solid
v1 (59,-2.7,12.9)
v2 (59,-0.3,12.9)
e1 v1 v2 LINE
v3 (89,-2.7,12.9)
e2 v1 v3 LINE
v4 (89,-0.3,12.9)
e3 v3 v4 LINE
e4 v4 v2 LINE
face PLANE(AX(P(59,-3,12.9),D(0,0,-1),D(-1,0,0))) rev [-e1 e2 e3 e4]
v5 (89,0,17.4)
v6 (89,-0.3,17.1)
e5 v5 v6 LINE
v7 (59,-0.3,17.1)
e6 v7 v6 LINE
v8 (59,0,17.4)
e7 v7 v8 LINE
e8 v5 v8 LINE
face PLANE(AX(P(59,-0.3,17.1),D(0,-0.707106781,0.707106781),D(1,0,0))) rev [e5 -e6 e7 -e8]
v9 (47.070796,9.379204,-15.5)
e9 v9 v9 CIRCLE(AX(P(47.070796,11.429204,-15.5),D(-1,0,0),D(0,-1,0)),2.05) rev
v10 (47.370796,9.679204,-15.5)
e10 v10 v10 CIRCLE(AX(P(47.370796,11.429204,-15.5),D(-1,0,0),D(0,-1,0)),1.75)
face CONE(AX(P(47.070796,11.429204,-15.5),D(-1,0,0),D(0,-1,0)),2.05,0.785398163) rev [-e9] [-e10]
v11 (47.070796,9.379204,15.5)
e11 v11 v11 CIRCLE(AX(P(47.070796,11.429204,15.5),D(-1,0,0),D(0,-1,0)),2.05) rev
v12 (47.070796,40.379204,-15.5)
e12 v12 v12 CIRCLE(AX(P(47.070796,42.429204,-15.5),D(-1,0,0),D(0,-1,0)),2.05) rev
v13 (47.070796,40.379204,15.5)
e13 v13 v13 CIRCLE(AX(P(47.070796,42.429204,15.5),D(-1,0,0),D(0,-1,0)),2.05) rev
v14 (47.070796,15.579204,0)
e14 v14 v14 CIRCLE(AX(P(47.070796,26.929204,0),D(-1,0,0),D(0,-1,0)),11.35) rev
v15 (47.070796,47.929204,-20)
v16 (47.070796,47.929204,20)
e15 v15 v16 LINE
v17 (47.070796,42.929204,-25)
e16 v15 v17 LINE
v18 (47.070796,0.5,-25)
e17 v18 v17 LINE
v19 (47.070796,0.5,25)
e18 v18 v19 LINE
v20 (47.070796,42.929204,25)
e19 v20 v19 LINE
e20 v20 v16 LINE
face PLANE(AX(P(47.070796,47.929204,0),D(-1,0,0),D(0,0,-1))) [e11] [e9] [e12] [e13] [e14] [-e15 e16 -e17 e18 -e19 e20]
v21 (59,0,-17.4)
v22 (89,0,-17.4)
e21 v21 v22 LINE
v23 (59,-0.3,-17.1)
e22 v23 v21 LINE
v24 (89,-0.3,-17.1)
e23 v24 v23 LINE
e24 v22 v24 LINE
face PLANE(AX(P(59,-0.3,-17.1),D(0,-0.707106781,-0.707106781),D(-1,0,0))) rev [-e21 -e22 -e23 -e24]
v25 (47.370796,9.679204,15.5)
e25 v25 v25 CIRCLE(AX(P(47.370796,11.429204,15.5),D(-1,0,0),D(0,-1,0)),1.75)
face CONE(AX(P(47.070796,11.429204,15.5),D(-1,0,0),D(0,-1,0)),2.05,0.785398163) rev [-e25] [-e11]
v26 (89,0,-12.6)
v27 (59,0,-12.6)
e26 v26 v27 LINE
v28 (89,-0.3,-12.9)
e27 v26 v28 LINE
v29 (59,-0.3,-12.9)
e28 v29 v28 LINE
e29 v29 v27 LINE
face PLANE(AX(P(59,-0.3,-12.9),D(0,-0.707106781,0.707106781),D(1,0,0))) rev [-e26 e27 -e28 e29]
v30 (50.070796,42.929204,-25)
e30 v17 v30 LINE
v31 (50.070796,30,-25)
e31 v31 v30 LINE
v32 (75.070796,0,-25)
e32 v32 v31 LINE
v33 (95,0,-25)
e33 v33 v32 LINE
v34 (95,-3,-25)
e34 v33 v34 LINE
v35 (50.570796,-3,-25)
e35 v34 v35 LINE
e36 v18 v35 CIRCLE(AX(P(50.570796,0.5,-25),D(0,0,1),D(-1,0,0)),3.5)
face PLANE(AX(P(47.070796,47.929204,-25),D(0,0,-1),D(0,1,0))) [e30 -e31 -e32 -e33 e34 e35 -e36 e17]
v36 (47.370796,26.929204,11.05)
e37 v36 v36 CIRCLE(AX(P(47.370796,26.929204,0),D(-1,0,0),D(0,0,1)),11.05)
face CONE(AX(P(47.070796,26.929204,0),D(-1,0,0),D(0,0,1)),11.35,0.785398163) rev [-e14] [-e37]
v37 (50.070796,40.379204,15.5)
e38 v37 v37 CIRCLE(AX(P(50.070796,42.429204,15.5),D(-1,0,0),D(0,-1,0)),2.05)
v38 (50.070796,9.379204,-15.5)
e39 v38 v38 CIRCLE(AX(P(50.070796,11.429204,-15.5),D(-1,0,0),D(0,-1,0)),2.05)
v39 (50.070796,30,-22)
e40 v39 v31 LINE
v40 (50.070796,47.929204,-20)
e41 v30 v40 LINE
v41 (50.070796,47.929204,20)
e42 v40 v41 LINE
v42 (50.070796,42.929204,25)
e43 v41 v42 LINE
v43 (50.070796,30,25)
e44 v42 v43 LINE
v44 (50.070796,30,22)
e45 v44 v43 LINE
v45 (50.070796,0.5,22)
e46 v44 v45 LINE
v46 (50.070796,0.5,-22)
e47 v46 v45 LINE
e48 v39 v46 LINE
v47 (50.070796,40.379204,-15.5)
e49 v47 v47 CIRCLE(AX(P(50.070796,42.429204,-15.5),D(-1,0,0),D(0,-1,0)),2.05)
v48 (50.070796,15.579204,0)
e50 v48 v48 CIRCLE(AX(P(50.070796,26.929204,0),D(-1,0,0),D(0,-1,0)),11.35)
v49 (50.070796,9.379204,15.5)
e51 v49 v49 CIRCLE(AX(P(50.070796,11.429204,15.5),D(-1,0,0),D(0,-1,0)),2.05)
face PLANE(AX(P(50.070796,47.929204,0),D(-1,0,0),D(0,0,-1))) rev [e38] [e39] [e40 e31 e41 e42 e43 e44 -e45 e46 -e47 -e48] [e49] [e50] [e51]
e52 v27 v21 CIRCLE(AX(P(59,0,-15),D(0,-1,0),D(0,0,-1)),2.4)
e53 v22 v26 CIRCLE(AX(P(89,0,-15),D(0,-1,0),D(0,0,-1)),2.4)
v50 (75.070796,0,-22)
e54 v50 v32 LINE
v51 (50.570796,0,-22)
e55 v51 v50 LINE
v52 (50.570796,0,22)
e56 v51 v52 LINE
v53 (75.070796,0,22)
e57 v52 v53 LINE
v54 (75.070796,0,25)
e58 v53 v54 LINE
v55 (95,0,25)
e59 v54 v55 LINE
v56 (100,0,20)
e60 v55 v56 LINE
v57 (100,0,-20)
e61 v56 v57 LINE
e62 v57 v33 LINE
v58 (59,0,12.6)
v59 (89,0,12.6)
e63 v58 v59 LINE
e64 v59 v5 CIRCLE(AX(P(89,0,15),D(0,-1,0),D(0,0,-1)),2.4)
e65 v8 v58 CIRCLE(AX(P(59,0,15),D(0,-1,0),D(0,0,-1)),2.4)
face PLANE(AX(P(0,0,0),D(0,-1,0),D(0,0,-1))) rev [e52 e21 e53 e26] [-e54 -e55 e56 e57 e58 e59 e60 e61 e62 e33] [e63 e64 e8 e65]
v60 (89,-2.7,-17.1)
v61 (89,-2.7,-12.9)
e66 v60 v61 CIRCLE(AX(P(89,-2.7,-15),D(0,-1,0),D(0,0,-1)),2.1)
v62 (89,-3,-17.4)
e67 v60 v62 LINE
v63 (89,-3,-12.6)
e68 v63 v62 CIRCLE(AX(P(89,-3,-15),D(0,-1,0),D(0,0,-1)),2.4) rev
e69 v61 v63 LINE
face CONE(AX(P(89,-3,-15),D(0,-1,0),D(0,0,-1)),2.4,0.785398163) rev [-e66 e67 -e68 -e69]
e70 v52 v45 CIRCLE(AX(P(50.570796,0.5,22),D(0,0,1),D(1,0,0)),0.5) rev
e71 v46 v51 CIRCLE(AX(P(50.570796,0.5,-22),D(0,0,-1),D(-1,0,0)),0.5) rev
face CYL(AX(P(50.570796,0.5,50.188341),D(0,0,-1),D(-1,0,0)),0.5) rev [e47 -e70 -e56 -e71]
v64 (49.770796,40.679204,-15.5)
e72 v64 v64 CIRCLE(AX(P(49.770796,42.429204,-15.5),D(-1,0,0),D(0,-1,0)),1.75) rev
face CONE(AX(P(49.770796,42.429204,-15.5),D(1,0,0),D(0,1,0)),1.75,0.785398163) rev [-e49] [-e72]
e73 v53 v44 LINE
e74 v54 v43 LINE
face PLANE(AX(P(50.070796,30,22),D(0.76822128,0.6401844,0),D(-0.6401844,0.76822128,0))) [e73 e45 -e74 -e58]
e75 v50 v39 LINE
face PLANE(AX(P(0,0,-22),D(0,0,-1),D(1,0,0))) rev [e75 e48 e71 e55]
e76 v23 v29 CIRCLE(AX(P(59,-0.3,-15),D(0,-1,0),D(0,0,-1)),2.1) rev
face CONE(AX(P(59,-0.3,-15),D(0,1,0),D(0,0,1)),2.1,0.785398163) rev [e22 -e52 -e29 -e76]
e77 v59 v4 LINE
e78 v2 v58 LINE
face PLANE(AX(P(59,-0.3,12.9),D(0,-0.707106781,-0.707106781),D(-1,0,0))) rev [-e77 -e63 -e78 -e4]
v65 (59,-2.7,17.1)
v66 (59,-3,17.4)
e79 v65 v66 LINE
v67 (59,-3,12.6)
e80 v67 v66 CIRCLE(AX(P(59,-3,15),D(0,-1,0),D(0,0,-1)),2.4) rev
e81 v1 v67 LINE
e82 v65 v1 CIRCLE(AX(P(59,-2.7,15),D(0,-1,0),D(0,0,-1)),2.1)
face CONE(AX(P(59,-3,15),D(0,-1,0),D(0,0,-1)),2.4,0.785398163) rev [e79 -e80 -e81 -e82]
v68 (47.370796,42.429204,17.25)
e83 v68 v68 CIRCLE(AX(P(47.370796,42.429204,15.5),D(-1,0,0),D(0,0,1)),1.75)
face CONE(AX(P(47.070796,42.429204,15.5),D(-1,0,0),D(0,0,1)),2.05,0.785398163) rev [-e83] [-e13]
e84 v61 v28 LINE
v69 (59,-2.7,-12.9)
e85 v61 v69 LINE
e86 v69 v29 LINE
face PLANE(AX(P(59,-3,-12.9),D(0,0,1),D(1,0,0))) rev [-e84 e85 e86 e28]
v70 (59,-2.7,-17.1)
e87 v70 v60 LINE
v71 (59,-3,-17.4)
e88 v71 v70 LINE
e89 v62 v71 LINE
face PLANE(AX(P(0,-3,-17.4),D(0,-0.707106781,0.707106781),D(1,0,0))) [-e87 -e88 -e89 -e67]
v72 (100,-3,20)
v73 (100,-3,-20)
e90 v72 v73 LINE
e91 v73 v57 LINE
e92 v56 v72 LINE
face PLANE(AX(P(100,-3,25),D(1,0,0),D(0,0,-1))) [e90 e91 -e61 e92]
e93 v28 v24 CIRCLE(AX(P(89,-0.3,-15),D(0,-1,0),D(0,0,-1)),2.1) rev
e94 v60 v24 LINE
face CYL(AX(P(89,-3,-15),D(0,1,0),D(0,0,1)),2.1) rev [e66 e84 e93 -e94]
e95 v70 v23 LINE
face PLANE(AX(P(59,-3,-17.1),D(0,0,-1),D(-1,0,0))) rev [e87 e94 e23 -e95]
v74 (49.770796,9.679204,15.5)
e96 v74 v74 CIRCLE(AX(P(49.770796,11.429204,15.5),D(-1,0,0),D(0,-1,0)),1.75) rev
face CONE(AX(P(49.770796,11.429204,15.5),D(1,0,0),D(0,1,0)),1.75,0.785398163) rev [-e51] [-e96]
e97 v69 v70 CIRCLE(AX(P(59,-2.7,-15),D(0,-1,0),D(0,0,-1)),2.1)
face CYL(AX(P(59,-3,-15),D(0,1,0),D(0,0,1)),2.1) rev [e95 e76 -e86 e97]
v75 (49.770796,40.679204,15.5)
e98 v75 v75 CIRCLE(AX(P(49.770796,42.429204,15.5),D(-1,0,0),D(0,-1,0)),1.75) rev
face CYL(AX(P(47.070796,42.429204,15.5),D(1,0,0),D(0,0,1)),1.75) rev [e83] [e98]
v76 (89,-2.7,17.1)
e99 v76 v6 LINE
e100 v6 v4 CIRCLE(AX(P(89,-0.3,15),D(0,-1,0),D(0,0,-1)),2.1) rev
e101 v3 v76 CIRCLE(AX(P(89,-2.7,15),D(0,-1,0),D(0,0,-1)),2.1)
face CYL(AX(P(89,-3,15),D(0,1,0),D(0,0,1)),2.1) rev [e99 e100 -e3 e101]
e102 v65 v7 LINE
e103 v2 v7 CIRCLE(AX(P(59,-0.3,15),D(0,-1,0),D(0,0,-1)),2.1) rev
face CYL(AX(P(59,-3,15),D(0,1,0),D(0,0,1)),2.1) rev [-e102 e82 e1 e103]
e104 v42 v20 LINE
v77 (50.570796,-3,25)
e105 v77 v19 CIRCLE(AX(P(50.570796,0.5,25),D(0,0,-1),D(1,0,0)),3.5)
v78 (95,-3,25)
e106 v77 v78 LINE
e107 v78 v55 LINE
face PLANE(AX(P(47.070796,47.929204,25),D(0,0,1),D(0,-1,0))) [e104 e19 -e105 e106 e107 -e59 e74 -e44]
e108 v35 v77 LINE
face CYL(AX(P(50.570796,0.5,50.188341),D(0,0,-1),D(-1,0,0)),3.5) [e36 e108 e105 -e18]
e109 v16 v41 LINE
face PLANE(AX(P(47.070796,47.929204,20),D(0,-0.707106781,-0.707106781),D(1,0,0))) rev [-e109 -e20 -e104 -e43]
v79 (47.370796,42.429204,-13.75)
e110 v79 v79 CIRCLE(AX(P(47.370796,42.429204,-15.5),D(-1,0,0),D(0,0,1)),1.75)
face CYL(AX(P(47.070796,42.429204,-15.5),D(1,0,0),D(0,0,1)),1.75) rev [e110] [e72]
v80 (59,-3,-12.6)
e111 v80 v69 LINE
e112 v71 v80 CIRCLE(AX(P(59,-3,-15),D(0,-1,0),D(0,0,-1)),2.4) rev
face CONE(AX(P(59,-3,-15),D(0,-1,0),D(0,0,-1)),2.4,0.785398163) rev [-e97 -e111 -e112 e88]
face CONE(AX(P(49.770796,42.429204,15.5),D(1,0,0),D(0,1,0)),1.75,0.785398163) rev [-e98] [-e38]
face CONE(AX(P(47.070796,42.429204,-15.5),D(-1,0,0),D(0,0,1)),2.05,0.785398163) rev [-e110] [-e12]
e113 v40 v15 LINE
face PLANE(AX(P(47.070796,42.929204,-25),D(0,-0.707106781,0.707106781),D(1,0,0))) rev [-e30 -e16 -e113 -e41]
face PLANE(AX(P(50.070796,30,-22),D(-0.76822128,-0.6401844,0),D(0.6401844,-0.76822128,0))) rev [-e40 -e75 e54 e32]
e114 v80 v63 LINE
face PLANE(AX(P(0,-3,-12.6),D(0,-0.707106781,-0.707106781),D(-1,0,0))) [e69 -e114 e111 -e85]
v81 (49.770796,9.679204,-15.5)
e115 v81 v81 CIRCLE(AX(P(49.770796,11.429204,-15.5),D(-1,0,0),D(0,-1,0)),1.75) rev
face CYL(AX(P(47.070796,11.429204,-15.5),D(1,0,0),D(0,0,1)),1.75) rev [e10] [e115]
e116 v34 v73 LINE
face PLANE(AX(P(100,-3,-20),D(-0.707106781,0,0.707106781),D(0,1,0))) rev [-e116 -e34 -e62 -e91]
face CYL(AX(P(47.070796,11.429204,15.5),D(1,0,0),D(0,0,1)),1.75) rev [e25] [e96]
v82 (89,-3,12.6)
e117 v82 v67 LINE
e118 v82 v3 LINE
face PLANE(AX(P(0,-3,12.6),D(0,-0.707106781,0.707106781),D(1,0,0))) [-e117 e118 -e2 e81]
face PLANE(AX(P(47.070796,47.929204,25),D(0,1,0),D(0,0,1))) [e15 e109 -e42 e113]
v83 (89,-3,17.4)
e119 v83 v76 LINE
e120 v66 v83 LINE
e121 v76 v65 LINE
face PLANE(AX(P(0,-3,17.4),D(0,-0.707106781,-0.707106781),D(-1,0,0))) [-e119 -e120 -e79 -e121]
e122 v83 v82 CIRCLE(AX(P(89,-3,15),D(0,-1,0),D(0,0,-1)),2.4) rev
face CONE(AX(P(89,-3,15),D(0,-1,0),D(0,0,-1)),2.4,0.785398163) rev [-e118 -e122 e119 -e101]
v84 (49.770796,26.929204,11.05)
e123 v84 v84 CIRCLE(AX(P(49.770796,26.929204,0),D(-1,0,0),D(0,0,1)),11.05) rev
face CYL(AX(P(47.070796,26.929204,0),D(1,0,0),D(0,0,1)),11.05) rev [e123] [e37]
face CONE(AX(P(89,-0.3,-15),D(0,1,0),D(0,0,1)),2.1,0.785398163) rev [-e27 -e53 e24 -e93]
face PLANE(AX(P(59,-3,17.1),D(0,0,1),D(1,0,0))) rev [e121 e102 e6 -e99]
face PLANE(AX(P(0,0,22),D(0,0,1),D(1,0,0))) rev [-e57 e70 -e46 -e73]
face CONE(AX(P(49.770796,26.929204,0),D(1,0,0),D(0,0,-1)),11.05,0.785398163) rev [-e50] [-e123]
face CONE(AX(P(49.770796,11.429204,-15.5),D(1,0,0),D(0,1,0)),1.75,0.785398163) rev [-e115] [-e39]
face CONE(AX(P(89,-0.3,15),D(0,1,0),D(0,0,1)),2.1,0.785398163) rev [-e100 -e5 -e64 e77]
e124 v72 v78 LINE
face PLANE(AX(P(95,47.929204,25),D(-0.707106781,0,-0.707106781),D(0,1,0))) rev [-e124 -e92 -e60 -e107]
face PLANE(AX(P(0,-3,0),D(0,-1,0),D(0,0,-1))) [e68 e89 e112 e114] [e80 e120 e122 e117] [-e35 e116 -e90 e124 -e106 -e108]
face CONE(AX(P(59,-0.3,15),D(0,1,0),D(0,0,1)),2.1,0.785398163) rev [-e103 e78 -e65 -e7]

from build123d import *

# Parameters (mm, degrees)
SKETCH1_W                    = 100
SKETCH1_H                    = 50
BASE_FLANGE1_DEPTH           = 3
SKETCH2_R                    = 11.05
SKETCH2_R_2                  = 1.75
CUT_EXTRUDE1_DEPTH           = 104.121287812
CUT_EXTRUDE3_DEPTH           = 104.121287812
SKETCHED_BEND2_OUTLINE_W     = 3
SKETCHED_BEND2_OUTLINE_H     = 50
SKETCHED_BEND2_DEPTH         = 47.070796327
SKETCHED_START               = 47.411206327
SKETCHED_BEND2_2_OUTLINE_W   = 47.929203673
SKETCHED_BEND2_2_OUTLINE_H   = 50
SKETCHED_BEND2_2_OUTLINE_R   = 1.75
SKETCHED_BEND2_2_OUTLINE_R_2 = 11.05
SKETCHED_BEND2_2_DEPTH       = 2.65959
SKETCHED_START_2             = 47.070796327
SKETCHED_BEND2_3_OUTLINE_W   = 47.929203673
SKETCHED_BEND2_3_OUTLINE_H   = 50
SKETCHED_BEND2_3_OUTLINE_R   = 1.75
SKETCHED_BEND2_3_OUTLINE_R_2 = 11.05
SKETCHED_BEND2_3_DEPTH       = 3.5
SKETCHED_START_3             = -26
SKETCHED_BEND2_4_DEPTH       = 52
BOSS_EXTRUDE1_DEPTH          = 3
CHAMFER1_SIZE                = 5
CHAMFER2_SIZE                = 0.3


with BuildPart() as part:
    # Base-Flange1: sheet metal written as solids
    # Sketch1 → Base-Flange1 (new body)
    with BuildSketch(Plane(origin=(0, 0, 0), x_dir=(1, 0, 0), z_dir=(0, 1, 0))):
        with Locations((50, 0)):
            Rectangle(SKETCH1_W, SKETCH1_H)
    extrude(amount=-BASE_FLANGE1_DEPTH)

    # Sketch2 → Cut-Extrude1 (cut, through all)
    with BuildSketch(Plane(origin=(0, 0, 0), x_dir=(1, 0, 0), z_dir=(0, 1, 0))):
        with Locations(Location((21, 0, 0), (0, 0, 270))):
            Circle(SKETCH2_R)
        with Locations(Location((5.5, 15.5, 0), (0, 0, 270))):
            Circle(SKETCH2_R_2)
        with Locations(Location((36.5, 15.5, 0), (0, 0, 270))):
            Circle(SKETCH2_R_2)
        with Locations(Location((36.5, -15.5, 0), (0, 0, 270))):
            Circle(SKETCH2_R_2)
        with Locations(Location((5.5, -15.5, 0), (0, 0, 270))):
            Circle(SKETCH2_R_2)
    extrude(amount=-CUT_EXTRUDE1_DEPTH, mode=Mode.SUBTRACT)

    # Sketch4 → Cut-Extrude3 (cut, through all)
    with BuildSketch(Plane(origin=(0, 0, 0), x_dir=(1, 0, 0), z_dir=(0, 1, 0))):
        with BuildLine():
            Line((59, 17.1), (89, 17.1))
            ThreePointArc((89, 17.1), (91.1, 15), (89, 12.9))
            Line((89, 12.9), (59, 12.9))
            ThreePointArc((59, 12.9), (56.9, 15), (59, 17.1))
        make_face()
        with BuildLine():
            Line((59, -12.9), (89, -12.9))
            ThreePointArc((89, -12.9), (91.1, -15), (89, -17.1))
            Line((89, -17.1), (59, -17.1))
            ThreePointArc((59, -17.1), (56.9, -15), (59, -12.9))
        make_face()
    extrude(amount=-CUT_EXTRUDE3_DEPTH, mode=Mode.SUBTRACT)

    # Sketched Bend2: read off the stored shape, not the designer's step
    # Sketched Bend2 outline → Sketched Bend2 (cut)
    with BuildSketch(Plane.YZ):
        with Locations((-1.5, 0)):
            Rectangle(SKETCHED_BEND2_OUTLINE_W, SKETCHED_BEND2_OUTLINE_H)
    extrude(amount=SKETCHED_BEND2_DEPTH, mode=Mode.SUBTRACT)

    # Sketched Bend2 2 outline → Sketched Bend2 2 (add)
    with BuildSketch(Plane.YZ.offset(SKETCHED_START)):
        with Locations((23.964601837, 0)):
            Rectangle(SKETCHED_BEND2_2_OUTLINE_W, SKETCHED_BEND2_2_OUTLINE_H)
        with Locations((11.429203673, -15.5)):
            Circle(SKETCHED_BEND2_2_OUTLINE_R, mode=Mode.SUBTRACT)
        with Locations((42.429203673, -15.5)):
            Circle(SKETCHED_BEND2_2_OUTLINE_R, mode=Mode.SUBTRACT)
        with Locations((11.429203673, 15.5)):
            Circle(SKETCHED_BEND2_2_OUTLINE_R, mode=Mode.SUBTRACT)
        with Locations((26.929203673, 0)):
            Circle(SKETCHED_BEND2_2_OUTLINE_R_2, mode=Mode.SUBTRACT)
        with Locations((42.429203673, 15.5)):
            Circle(SKETCHED_BEND2_2_OUTLINE_R, mode=Mode.SUBTRACT)
    extrude(amount=SKETCHED_BEND2_2_DEPTH)

    # Sketched Bend2 3 outline → Sketched Bend2 3 (add)
    with BuildSketch(Plane.YZ.offset(SKETCHED_START_2)):
        with Locations((23.964601837, 0)):
            Rectangle(SKETCHED_BEND2_3_OUTLINE_W, SKETCHED_BEND2_3_OUTLINE_H)
        with Locations((11.429203673, -15.5)):
            Circle(SKETCHED_BEND2_3_OUTLINE_R, mode=Mode.SUBTRACT)
        with Locations((42.429203673, -15.5)):
            Circle(SKETCHED_BEND2_3_OUTLINE_R, mode=Mode.SUBTRACT)
        with Locations((11.429203673, 15.5)):
            Circle(SKETCHED_BEND2_3_OUTLINE_R, mode=Mode.SUBTRACT)
        with Locations((26.929203673, 0)):
            Circle(SKETCHED_BEND2_3_OUTLINE_R_2, mode=Mode.SUBTRACT)
        with Locations((42.429203673, 15.5)):
            Circle(SKETCHED_BEND2_3_OUTLINE_R, mode=Mode.SUBTRACT)
    extrude(amount=SKETCHED_BEND2_3_DEPTH)

    # Sketched Bend2 4 outline → Sketched Bend2 4 (cut)
    with BuildSketch(Plane.XY.offset(SKETCHED_START_3)):
        with BuildLine():
            Line((50.570796327, 47.929203673), (50.070796327, 47.929203673))
            Line((50.070796327, 47.929203673), (50.070796327, 0.5))
            ThreePointArc((50.070796327, 0.5), (50.217242936, 0.146446609), (50.570796327, 0))
            Line((50.570796327, 0), (50.570796327, 47.929203673))
        make_face()
        with BuildLine():
            ThreePointArc((50.570796327, -3), (48.095922593, -1.974873734), (47.070796327, 0.5))
            Line((47.070796327, 0.5), (47.070796327, -3))
            Line((47.070796327, -3), (50.570796327, -3))
        make_face()
    extrude(amount=SKETCHED_BEND2_4_DEPTH, mode=Mode.SUBTRACT)

    # Sketch6 → Boss-Extrude1 (add)
    with BuildSketch(Plane.XY.offset(25)):
        Polygon((50.070796327, 30), (75.070796327, 0), (50.070796327, 0), align=None)
    boss_extrude1 = extrude(amount=-BOSS_EXTRUDE1_DEPTH)

    # Mirror1: Boss-Extrude1 across plane
    add(boss_extrude1.mirror(Plane.XY))

    # Chamfer1
    chamfer1_edges = [part.edges().sort_by_distance(p)[0] for p in [
        (48.570796327, 47.929203673, -25),
        (48.570796327, 47.929203673, 25),
        (100, -1.5, -25),
        (100, -1.5, 25),
    ]]
    chamfer(chamfer1_edges, length=CHAMFER1_SIZE)

    # Chamfer2
    chamfer2_edges = [part.edges().sort_by_distance(p)[0] for p in [
        (47.070796327, 15.879203673, 0),
        (50.070796327, 15.879203673, 0),
        (47.070796327, 40.679203673, -15.5),
        (50.070796327, 40.679203673, -15.5),
        (47.070796327, 9.679203673, -15.5),
        (50.070796327, 9.679203673, -15.5),
        (47.070796327, 9.679203673, 15.5),
        (50.070796327, 9.679203673, 15.5),
        (47.070796327, 40.679203673, 15.5),
        (50.070796327, 40.679203673, 15.5),
        (74, 0, -17.1),
        (91.1, 0, -15),
        (74, 0, -12.9),
        (56.9, 0, -15),
        (74, 0, 12.9),
        (91.1, 0, 15),
        (74, 0, 17.1),
        (56.9, 0, 15),
        (56.9, -3, 15),
        (74, -3, 17.1),
        (91.1, -3, 15),
        (74, -3, 12.9),
        (56.9, -3, -15),
        (74, -3, -12.9),
        (91.1, -3, -15),
        (74, -3, -17.1),
    ]]
    chamfer(chamfer2_edges, length=CHAMFER2_SIZE)


solid = part.part
